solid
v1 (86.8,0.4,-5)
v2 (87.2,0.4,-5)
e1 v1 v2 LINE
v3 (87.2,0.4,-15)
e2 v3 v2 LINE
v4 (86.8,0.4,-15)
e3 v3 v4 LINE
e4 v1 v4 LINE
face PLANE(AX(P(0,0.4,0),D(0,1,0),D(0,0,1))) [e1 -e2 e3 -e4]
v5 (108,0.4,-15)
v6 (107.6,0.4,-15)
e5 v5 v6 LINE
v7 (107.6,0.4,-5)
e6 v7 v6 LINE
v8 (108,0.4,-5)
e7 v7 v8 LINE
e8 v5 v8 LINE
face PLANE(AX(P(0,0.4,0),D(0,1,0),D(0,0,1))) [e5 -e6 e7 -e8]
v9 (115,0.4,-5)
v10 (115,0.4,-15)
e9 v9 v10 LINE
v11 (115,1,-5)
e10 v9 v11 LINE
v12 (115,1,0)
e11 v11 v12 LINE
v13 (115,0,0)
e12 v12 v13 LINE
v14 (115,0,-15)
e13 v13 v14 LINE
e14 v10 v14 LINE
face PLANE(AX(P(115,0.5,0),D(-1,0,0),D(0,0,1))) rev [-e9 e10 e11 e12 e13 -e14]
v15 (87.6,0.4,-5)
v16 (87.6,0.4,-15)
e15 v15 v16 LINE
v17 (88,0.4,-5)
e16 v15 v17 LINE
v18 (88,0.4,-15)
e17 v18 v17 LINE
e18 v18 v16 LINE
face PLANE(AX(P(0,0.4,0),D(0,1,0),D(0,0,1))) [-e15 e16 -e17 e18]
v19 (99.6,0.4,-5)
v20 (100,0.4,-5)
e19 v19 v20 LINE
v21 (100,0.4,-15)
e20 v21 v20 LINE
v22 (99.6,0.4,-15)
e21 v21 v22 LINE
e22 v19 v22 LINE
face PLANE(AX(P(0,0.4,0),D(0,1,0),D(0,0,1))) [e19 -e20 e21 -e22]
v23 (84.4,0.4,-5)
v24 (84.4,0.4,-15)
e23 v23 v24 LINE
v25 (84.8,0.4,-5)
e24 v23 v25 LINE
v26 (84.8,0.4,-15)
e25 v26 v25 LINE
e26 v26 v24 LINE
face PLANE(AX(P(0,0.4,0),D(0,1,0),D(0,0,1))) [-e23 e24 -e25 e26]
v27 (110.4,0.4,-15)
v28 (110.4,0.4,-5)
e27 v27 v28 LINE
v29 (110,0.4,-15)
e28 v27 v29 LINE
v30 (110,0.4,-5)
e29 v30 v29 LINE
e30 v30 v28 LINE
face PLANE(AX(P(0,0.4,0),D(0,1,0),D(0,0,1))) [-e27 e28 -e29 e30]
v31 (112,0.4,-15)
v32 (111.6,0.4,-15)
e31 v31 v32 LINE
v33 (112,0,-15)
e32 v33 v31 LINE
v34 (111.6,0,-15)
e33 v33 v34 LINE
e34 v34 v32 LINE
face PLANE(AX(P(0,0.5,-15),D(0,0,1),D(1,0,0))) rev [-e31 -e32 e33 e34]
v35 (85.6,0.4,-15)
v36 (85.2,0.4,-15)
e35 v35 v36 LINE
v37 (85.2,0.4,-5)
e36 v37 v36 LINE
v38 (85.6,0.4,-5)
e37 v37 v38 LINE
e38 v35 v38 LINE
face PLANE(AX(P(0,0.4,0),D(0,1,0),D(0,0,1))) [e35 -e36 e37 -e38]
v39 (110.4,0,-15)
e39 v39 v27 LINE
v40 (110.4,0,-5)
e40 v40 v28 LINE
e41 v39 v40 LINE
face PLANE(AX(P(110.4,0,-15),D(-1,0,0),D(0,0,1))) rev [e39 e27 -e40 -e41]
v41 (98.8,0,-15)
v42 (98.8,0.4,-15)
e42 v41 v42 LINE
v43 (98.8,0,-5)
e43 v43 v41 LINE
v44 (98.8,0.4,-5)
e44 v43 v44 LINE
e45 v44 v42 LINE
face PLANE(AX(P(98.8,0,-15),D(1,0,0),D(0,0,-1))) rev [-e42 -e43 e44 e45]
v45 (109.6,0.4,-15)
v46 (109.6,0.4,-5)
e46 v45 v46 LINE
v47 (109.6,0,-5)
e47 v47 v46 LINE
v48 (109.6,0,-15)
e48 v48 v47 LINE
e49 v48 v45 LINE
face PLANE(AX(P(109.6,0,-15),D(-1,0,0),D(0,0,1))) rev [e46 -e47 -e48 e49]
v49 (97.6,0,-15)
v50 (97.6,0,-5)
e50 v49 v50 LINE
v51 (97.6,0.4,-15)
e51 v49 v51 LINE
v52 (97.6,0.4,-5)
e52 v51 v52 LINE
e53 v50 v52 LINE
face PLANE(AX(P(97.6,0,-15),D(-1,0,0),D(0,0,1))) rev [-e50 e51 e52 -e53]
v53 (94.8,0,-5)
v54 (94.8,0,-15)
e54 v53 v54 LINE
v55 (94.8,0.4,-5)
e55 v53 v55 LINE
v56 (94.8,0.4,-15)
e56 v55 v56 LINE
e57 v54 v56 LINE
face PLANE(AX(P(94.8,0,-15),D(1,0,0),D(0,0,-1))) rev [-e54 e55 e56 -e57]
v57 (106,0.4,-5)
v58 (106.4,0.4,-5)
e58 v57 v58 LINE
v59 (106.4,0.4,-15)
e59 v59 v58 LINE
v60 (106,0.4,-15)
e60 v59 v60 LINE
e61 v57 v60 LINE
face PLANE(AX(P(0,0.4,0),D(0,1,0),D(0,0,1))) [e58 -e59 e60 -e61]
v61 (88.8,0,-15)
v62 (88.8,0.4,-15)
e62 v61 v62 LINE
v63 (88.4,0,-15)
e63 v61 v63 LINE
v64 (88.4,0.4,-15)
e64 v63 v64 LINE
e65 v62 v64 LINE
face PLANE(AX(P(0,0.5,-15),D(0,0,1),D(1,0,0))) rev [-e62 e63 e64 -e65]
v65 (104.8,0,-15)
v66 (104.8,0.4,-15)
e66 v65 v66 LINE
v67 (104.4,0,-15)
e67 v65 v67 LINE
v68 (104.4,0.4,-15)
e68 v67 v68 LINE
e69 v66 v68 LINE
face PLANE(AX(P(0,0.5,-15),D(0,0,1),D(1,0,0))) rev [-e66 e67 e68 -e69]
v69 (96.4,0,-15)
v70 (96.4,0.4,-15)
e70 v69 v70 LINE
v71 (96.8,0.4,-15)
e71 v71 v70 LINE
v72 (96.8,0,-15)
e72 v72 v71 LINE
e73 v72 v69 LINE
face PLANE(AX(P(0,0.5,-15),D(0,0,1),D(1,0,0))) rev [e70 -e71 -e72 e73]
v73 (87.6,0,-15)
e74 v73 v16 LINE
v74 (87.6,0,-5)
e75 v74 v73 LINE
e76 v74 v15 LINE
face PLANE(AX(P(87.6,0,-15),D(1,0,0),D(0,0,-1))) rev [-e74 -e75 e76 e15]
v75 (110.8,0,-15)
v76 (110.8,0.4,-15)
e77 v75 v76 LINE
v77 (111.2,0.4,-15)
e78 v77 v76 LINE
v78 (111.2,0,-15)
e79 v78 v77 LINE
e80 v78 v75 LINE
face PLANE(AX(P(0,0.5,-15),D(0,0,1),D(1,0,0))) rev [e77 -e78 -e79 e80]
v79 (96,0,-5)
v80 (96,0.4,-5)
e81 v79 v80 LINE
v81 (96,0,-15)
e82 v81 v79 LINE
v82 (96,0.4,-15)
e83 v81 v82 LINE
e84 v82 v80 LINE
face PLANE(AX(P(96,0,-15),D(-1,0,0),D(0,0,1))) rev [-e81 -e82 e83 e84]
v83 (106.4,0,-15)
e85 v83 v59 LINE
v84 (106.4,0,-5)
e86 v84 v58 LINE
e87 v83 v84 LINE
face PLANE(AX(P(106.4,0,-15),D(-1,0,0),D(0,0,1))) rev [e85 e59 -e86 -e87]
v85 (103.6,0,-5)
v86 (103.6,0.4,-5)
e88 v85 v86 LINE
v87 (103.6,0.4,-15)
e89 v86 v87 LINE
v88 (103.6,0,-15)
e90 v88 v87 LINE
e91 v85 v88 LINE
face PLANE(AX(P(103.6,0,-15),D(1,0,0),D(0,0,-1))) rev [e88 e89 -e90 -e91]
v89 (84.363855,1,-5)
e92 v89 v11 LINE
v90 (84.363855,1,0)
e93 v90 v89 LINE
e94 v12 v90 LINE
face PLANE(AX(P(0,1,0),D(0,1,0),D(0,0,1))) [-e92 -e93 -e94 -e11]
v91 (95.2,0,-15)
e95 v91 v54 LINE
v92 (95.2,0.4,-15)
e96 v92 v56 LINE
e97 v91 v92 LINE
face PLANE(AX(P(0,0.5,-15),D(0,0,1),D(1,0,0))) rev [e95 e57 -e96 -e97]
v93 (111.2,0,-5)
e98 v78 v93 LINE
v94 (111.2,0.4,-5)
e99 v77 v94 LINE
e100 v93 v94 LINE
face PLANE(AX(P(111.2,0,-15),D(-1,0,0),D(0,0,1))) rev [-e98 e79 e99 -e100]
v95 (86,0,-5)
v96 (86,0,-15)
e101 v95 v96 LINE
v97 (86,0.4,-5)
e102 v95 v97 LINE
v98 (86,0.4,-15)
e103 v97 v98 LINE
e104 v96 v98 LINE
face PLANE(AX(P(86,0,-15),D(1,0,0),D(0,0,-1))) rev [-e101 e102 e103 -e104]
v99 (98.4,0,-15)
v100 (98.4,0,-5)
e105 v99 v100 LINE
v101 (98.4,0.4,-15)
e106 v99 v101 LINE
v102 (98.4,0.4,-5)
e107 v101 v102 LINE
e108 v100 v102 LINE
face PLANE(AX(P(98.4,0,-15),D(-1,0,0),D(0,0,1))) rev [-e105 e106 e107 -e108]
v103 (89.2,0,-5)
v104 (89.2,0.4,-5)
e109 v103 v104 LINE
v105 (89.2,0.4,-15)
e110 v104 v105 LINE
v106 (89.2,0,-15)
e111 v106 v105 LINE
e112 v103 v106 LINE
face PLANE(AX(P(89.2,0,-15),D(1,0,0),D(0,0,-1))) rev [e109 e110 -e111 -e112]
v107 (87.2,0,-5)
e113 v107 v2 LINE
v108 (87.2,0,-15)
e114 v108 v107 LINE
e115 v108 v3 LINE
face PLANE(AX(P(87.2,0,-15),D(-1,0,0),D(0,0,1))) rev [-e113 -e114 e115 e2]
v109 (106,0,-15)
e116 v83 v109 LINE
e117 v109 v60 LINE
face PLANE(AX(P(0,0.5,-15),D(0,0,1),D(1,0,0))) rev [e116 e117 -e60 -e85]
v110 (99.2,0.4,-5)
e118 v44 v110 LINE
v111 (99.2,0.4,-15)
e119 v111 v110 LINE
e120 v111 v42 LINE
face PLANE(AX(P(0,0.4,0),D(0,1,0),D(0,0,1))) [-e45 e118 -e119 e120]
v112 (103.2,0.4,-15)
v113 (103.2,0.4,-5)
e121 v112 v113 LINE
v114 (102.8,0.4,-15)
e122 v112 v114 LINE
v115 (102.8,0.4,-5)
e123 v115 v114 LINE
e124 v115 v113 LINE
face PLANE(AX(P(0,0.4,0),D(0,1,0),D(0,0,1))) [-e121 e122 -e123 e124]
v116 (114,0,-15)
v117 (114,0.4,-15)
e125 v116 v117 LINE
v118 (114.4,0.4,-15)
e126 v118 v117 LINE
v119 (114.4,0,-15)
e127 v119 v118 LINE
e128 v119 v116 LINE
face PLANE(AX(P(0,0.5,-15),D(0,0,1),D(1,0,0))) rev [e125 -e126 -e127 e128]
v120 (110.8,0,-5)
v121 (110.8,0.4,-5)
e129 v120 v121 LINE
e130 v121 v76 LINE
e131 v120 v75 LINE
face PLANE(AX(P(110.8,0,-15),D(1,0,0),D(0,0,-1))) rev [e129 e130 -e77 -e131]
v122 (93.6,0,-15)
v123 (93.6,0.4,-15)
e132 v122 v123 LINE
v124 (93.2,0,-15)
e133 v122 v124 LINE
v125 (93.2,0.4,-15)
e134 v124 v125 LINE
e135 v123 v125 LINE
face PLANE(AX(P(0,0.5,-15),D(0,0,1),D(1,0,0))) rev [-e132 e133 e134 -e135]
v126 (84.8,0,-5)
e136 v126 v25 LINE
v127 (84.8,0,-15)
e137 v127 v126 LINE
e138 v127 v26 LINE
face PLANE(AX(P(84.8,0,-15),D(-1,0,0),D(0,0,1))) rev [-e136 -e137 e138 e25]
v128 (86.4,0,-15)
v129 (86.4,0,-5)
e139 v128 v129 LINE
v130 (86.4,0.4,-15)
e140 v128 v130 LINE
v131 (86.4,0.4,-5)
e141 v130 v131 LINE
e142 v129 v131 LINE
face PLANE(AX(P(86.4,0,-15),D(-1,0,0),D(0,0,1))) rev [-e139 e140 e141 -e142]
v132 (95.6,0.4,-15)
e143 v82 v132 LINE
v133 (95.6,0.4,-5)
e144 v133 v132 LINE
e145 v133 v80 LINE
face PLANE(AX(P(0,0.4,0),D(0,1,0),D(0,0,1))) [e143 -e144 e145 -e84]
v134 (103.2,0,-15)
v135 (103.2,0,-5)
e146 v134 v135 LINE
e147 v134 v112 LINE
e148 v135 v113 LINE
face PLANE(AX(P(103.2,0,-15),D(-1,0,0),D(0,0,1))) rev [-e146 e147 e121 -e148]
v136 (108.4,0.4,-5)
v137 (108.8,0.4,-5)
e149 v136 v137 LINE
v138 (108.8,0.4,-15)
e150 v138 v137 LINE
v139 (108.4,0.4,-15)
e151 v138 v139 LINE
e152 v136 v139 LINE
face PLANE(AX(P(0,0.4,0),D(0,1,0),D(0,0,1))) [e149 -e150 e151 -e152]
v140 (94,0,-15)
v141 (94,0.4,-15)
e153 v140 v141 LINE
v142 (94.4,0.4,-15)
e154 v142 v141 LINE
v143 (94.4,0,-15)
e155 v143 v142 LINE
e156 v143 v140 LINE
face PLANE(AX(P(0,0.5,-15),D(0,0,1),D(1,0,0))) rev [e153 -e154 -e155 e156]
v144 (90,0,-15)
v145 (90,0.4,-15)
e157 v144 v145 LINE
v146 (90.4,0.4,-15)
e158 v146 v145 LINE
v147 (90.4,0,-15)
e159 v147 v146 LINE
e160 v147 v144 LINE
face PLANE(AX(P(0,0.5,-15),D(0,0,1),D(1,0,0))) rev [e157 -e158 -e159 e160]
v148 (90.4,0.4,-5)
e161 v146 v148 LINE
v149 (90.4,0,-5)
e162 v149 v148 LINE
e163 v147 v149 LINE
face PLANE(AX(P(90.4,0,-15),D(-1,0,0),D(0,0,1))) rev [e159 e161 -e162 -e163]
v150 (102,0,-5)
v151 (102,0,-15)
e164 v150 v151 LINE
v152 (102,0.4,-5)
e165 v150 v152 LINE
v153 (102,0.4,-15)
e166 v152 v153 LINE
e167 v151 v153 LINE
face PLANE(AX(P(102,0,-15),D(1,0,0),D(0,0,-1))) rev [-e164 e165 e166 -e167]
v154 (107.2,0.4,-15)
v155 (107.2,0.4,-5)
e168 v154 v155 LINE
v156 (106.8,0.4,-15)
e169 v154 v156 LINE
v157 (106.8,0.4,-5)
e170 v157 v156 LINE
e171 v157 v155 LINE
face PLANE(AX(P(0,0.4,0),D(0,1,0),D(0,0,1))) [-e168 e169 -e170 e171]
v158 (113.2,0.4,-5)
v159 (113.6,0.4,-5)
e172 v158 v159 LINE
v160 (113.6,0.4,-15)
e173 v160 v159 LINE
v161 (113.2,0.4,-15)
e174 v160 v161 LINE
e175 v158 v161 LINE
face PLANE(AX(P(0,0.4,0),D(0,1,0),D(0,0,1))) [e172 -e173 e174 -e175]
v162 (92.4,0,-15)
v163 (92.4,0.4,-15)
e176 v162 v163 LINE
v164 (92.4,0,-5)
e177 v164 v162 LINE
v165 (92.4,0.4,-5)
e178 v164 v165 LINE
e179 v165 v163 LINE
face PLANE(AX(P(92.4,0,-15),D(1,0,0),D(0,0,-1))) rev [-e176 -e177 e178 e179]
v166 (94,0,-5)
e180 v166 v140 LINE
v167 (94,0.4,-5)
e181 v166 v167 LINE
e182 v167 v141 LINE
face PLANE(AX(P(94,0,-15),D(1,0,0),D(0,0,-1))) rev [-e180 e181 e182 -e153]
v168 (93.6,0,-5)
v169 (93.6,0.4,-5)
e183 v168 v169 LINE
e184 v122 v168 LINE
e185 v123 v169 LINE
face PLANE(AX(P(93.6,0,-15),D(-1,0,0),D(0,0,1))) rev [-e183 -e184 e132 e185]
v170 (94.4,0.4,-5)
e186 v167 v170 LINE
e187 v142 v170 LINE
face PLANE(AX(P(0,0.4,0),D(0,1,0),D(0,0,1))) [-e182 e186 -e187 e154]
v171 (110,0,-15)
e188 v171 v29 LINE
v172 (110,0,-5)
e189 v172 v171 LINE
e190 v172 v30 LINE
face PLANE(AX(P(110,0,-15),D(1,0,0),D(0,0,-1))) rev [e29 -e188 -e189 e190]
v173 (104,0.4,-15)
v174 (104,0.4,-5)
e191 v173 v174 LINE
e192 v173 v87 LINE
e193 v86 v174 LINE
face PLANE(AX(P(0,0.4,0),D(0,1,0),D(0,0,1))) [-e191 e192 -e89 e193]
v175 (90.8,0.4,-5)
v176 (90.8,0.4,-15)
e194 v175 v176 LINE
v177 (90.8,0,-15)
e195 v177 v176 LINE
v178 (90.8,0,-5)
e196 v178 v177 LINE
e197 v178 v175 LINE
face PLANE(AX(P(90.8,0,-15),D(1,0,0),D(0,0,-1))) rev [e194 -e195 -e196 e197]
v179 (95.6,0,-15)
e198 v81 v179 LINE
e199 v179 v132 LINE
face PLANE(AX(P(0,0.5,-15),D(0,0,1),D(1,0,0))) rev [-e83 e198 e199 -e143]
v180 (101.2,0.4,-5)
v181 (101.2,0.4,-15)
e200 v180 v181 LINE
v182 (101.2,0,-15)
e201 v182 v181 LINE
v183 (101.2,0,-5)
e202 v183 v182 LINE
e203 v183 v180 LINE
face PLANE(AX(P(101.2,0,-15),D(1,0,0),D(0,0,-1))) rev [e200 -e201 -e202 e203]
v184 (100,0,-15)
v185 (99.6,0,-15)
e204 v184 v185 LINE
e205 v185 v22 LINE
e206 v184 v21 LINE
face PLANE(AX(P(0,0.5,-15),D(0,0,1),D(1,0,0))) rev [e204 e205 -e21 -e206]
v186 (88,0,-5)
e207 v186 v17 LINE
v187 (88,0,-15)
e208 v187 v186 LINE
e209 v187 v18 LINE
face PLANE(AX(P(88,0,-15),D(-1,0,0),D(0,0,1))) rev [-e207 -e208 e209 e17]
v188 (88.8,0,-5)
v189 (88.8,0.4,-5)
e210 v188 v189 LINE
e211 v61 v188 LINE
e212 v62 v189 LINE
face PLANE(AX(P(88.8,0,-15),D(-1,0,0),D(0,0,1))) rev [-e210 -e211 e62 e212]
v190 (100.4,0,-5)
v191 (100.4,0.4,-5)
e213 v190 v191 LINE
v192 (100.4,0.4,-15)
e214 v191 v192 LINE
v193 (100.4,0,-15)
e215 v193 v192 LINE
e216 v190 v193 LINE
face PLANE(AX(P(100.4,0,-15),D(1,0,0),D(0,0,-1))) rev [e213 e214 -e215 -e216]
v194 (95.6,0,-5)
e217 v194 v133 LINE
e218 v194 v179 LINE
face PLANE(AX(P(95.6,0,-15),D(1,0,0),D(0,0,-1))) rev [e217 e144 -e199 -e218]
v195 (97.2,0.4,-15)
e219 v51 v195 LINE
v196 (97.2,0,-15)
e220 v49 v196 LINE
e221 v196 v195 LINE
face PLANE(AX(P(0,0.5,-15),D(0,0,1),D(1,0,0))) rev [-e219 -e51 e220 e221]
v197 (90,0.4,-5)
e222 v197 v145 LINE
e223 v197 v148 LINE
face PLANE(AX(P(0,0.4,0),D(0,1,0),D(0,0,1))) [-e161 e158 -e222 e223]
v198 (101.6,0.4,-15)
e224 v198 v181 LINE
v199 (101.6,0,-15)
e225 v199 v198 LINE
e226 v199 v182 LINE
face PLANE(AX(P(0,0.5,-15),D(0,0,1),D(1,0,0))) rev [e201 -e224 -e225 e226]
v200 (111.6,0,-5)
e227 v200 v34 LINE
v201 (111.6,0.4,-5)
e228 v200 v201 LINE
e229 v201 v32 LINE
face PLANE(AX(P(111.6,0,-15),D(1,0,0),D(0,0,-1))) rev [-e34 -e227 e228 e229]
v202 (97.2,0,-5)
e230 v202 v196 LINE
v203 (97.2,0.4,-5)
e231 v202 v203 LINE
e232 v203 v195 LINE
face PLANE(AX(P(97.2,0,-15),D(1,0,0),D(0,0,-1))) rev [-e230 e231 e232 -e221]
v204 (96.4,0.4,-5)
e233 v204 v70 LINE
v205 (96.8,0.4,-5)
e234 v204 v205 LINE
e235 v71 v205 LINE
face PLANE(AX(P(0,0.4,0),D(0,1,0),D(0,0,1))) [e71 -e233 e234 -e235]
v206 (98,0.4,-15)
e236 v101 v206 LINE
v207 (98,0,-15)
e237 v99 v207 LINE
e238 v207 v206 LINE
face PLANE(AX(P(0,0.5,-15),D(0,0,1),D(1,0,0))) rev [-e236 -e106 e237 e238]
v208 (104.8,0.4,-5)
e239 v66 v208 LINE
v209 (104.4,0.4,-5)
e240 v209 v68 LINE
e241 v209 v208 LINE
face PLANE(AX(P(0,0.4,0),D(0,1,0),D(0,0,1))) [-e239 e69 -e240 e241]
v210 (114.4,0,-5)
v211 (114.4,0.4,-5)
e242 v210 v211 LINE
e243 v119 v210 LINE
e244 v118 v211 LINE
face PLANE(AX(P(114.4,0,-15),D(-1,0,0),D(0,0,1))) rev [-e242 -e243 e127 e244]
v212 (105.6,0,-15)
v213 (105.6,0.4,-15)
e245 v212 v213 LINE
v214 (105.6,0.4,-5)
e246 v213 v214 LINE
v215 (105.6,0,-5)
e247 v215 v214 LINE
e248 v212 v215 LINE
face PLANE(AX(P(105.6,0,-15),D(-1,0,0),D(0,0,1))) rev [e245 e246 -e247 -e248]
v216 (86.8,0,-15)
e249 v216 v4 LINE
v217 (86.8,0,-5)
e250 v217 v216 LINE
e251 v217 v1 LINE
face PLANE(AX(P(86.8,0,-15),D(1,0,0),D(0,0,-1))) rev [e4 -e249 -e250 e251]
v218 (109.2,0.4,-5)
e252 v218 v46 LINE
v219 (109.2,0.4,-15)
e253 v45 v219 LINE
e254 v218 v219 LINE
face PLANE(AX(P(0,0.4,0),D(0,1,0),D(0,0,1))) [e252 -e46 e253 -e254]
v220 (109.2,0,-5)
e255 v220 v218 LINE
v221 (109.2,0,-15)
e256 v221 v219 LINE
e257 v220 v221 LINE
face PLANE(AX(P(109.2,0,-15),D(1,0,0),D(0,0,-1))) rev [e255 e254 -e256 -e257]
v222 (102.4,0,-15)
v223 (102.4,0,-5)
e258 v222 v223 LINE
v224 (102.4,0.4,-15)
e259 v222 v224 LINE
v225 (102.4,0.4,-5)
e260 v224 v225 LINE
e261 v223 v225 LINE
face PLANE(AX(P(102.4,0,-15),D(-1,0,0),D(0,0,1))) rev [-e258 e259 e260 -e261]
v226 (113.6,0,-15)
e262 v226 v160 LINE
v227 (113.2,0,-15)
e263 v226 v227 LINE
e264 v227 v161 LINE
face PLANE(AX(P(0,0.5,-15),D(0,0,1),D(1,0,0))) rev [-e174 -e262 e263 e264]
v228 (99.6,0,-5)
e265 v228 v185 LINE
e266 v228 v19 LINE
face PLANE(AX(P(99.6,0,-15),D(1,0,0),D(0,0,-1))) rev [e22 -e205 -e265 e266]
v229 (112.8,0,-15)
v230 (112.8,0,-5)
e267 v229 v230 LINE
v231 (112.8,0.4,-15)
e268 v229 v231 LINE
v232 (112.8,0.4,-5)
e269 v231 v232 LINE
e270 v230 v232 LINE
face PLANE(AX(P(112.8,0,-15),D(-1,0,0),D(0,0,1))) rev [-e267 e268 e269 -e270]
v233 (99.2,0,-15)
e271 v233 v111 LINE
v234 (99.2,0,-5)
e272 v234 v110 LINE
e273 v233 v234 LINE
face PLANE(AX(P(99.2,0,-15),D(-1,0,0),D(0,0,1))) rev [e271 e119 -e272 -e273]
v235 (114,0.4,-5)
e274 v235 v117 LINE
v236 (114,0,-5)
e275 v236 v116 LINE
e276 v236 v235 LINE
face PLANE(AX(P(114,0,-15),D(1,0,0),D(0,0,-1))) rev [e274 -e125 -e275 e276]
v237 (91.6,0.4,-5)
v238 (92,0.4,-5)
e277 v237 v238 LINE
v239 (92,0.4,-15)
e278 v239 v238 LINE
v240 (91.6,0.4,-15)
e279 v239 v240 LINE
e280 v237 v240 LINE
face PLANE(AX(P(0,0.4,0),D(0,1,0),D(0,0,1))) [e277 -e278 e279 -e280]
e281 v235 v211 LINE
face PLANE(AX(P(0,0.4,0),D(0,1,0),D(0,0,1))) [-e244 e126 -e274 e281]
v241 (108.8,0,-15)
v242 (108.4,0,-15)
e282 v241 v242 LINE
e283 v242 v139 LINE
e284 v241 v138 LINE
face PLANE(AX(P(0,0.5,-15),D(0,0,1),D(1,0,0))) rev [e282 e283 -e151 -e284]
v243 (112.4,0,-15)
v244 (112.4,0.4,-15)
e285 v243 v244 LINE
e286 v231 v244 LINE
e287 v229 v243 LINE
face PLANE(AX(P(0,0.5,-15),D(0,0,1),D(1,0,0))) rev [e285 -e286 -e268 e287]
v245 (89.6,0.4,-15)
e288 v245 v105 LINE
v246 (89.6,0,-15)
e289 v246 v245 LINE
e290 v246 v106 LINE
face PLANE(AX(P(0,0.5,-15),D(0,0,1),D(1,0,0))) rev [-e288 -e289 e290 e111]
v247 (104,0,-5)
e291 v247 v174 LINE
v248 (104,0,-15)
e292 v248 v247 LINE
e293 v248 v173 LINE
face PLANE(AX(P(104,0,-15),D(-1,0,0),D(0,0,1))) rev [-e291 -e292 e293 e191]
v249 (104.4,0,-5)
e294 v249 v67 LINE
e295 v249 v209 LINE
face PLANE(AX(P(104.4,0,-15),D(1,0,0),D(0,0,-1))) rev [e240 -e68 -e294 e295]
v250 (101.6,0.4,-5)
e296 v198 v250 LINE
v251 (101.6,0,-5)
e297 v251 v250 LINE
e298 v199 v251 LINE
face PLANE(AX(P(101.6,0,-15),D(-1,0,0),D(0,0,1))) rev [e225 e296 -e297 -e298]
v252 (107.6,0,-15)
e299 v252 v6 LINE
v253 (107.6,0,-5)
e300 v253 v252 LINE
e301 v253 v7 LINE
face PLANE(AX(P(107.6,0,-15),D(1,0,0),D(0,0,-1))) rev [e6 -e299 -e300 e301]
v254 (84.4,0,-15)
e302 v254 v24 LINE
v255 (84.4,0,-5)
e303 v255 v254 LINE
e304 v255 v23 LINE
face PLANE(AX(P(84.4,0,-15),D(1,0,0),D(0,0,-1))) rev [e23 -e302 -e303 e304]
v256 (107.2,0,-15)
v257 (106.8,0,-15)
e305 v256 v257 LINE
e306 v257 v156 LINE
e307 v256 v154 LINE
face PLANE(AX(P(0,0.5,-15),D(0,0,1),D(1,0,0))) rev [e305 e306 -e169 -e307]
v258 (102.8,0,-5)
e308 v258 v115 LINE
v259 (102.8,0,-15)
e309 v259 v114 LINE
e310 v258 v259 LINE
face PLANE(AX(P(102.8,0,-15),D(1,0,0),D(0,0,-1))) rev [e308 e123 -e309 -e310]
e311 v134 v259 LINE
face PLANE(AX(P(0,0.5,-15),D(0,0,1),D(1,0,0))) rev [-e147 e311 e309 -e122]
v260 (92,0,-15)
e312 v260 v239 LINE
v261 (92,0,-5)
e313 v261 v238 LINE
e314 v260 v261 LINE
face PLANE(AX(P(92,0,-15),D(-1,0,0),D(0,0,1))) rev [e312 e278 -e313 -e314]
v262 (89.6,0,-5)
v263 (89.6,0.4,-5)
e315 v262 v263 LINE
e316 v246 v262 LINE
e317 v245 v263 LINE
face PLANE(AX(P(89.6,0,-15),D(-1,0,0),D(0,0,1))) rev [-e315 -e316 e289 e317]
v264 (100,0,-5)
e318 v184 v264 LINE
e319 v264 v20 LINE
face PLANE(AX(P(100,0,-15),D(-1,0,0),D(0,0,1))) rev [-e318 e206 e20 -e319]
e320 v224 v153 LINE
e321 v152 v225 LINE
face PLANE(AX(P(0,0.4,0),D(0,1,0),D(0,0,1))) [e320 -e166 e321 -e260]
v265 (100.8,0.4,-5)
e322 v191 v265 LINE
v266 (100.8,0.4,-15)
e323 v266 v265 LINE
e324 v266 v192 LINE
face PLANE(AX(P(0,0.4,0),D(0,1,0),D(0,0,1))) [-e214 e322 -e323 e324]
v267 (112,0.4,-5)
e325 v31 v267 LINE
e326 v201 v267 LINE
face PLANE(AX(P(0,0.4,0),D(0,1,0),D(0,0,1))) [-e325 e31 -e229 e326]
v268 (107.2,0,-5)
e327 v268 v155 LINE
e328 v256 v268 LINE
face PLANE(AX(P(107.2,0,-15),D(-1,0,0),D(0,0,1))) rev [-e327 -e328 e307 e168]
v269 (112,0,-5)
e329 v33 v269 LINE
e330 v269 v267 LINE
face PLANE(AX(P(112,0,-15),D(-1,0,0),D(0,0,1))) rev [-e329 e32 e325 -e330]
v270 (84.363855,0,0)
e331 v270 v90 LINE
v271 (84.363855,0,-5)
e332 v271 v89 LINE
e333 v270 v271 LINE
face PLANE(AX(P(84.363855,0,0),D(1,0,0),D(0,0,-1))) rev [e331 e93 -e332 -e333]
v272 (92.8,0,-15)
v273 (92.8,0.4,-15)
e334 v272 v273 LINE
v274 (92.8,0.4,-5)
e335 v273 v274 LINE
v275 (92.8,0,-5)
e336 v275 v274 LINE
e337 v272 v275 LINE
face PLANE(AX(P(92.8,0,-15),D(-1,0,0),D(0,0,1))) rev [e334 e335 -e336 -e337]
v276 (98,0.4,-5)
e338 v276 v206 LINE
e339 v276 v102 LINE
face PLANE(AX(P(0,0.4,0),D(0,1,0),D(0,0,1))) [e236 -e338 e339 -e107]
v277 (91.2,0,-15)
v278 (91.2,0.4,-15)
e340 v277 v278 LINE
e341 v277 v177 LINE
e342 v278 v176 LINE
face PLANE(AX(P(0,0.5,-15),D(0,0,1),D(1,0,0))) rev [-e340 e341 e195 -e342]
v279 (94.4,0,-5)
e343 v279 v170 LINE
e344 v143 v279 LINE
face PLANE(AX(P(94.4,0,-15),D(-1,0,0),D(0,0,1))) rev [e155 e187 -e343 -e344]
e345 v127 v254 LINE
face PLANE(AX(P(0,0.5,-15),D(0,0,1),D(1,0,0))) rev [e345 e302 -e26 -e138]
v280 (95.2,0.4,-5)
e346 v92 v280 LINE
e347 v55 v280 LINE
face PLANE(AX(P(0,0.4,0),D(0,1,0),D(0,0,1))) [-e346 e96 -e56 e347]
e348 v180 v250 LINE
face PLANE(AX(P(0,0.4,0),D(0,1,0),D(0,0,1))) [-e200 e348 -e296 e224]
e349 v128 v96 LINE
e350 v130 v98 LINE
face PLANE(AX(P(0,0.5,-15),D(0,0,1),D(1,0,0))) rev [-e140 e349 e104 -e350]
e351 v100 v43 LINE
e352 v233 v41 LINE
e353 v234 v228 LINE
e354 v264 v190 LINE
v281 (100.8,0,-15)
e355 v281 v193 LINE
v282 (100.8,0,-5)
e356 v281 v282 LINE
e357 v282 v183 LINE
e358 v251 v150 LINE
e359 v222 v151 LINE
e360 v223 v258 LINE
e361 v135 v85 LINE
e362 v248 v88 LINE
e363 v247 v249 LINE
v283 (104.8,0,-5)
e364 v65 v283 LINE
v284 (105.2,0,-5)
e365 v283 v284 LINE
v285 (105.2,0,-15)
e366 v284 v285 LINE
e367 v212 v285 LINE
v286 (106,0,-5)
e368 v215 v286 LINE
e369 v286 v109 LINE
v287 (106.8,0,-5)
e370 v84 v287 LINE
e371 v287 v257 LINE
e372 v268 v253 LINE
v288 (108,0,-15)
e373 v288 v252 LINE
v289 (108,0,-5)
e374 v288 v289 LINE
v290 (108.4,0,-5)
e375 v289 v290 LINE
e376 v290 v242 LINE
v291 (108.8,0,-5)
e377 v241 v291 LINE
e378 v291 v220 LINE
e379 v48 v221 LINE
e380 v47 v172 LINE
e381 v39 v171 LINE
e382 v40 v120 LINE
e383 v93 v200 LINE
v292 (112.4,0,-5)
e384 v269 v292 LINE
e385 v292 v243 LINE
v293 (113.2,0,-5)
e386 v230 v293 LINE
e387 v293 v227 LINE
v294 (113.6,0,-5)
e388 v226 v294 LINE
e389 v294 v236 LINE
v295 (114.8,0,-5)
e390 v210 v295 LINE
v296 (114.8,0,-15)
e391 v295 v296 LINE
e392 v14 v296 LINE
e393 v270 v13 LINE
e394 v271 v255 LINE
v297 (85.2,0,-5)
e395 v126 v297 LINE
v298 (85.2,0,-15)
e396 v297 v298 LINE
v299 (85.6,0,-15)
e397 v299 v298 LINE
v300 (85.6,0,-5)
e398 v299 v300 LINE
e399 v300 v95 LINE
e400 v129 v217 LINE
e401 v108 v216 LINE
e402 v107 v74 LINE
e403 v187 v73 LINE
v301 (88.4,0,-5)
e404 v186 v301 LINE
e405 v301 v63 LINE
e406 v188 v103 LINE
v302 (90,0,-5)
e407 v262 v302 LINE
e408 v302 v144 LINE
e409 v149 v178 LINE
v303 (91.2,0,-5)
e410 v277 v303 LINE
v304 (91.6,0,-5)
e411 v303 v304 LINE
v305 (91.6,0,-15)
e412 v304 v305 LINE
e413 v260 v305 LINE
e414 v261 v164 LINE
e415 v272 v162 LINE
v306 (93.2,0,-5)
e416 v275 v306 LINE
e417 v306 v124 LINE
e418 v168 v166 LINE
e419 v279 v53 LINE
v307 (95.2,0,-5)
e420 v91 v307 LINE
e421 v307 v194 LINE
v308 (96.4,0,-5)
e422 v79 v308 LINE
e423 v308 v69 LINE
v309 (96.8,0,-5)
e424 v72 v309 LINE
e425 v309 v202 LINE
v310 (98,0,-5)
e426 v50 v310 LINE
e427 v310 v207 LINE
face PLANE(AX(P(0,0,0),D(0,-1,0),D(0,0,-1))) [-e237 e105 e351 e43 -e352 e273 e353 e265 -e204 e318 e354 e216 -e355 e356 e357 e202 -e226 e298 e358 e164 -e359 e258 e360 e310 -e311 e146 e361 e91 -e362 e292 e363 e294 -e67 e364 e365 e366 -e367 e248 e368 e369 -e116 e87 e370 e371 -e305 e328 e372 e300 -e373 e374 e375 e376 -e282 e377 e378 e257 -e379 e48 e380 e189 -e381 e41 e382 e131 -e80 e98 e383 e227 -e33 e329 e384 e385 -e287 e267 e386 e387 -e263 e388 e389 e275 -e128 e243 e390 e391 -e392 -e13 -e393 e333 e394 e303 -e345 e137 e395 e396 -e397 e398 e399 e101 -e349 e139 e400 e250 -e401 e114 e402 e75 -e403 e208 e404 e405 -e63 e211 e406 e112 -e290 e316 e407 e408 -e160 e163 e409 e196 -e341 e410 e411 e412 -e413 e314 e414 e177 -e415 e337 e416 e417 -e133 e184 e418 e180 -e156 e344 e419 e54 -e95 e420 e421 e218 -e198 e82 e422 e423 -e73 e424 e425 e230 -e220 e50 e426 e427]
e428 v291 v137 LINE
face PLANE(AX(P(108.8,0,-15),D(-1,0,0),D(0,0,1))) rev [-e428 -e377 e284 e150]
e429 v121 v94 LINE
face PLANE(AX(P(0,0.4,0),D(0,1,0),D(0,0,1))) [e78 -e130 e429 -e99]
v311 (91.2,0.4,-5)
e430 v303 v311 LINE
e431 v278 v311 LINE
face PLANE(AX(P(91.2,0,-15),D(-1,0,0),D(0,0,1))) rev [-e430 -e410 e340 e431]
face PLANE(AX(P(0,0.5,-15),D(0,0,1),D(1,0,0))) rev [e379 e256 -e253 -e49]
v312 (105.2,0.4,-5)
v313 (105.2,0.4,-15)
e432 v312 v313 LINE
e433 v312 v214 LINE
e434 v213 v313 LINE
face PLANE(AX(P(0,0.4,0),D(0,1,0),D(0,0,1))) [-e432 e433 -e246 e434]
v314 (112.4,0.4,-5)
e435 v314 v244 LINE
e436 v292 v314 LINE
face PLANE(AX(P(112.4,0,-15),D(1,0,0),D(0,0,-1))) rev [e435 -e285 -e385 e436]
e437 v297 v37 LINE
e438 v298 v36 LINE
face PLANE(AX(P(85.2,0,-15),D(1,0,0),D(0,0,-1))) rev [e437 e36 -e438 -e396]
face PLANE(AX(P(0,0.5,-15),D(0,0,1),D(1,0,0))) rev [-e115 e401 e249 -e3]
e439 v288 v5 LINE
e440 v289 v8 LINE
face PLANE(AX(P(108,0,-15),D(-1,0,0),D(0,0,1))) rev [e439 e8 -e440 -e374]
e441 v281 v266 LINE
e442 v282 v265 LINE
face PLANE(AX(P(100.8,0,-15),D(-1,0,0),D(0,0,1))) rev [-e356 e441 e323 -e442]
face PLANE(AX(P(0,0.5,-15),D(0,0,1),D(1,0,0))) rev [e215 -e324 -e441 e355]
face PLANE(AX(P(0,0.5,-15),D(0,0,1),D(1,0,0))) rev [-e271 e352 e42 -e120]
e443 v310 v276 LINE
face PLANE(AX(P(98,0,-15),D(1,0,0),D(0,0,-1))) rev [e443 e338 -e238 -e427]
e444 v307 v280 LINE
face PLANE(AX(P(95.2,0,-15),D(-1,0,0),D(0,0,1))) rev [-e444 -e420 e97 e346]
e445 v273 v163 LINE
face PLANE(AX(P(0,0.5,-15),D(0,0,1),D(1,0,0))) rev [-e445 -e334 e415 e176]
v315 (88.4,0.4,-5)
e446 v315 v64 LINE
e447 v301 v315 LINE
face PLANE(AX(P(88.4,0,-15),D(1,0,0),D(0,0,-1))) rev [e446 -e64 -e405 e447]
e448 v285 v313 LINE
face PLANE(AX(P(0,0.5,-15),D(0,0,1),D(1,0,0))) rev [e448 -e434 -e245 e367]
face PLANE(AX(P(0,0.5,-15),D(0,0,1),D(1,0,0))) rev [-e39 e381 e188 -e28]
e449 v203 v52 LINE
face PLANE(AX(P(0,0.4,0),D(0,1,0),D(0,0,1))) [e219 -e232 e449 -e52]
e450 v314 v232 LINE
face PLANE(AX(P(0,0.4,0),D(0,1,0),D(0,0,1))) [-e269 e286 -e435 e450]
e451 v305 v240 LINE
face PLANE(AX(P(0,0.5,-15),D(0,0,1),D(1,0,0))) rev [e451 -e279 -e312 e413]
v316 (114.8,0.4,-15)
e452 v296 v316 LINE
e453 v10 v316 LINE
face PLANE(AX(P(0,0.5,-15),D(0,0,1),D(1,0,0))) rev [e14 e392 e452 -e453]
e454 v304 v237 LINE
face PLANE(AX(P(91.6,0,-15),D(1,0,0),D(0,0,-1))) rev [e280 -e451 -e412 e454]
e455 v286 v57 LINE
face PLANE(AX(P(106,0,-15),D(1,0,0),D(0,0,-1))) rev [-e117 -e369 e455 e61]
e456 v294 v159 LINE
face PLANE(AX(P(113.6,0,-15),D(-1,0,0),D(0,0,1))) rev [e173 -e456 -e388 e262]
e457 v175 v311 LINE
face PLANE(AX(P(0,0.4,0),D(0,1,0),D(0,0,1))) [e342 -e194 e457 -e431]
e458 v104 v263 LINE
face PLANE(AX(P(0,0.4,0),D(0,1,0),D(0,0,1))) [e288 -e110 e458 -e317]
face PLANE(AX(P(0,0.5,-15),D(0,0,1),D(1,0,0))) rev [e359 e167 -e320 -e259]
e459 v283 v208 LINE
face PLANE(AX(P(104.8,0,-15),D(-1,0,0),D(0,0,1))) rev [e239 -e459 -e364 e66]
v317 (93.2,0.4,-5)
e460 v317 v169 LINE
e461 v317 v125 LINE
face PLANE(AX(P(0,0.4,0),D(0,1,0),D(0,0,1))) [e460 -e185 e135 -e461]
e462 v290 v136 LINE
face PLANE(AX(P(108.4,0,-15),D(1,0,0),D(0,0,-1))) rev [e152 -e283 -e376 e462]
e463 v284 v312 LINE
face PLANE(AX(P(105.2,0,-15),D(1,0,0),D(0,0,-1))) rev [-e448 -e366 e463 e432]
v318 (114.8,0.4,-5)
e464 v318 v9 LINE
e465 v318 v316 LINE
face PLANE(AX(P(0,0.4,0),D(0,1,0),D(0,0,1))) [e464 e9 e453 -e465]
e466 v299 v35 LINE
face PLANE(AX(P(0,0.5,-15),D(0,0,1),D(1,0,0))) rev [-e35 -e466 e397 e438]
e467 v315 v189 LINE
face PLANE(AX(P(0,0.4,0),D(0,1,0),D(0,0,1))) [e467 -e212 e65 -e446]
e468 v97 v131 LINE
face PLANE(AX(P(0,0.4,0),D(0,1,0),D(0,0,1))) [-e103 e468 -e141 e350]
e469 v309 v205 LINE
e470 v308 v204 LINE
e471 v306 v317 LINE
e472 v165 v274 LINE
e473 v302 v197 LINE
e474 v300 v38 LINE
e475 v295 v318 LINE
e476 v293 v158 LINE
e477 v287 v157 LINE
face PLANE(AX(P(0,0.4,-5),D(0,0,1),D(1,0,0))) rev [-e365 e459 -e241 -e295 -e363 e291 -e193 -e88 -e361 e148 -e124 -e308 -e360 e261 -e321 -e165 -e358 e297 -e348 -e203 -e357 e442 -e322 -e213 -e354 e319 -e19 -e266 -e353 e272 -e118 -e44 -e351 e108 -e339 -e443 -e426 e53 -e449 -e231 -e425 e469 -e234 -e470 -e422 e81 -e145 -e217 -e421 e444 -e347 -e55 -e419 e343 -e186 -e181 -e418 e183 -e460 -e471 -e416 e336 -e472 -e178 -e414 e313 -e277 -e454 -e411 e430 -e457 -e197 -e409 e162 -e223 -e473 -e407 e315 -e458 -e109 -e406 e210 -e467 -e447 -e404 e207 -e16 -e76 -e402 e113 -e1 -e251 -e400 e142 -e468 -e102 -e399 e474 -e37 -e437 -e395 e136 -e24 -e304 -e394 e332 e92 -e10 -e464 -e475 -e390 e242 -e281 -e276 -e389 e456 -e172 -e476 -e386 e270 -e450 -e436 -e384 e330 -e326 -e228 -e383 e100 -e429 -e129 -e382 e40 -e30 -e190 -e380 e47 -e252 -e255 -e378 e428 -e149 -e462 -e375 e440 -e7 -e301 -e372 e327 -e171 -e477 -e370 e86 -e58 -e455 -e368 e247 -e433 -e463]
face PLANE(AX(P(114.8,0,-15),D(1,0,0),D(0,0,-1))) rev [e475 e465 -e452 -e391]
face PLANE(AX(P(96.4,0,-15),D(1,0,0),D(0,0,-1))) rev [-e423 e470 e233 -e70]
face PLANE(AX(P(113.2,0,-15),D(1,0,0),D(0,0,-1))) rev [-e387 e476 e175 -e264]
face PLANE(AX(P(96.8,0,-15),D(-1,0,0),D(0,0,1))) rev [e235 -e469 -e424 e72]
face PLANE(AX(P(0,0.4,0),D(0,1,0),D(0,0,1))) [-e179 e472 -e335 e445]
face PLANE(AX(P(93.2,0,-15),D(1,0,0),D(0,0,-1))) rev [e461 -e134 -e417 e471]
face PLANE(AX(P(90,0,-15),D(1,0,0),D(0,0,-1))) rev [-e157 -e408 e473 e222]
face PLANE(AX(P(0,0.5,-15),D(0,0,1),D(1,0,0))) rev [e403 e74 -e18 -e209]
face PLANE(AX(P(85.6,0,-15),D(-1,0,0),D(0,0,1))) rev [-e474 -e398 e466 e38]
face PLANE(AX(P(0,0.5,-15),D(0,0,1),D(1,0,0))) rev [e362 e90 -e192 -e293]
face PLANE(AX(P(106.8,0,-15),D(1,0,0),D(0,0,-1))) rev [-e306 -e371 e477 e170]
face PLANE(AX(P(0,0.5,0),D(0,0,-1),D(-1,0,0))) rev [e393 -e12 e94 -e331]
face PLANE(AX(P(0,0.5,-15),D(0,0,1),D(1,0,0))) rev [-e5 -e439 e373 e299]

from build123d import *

# Parameters (mm, degrees)
SKETCH1_W           = 115
SKETCH1_H           = 15
BOSS_EXTRUDE1_DEPTH = 0.5
SKETCH2_W           = 115
SKETCH2_H           = 10
CUT_EXTRUDE1_DEPTH  = 0.1
SKETCH3_W           = 0.4
SKETCH3_H           = 10
CUT_EXTRUDE2_DEPTH  = 0.4
LPATTERN3_COUNT     = 150
LPATTERN3_PITCH     = 0.8
SKETCH4_W           = 115
SKETCH4_H           = 5
BOSS_EXTRUDE2_DEPTH = 1
SKETCH5_W           = 77.289086501
SKETCH5_H           = 15.822063322
CUT_EXTRUDE3_DEPTH  = 1
SKETCH6_W           = 3.197112069
SKETCH6_H           = 15.066627115
CUT_EXTRUDE4_DEPTH  = 1
SKETCH7_W           = 3.877656405
SKETCH7_H           = 15.126214191
CUT_EXTRUDE7_DEPTH  = 1


with BuildPart() as part:
    # Sketch1 → Boss-Extrude1 (new body)
    with BuildSketch(Plane(origin=(0, 0, 0), x_dir=(1, 0, 0), z_dir=(0, 1, 0))):
        with Locations((57.5, 7.5)):
            Rectangle(SKETCH1_W, SKETCH1_H)
    extrude(amount=BOSS_EXTRUDE1_DEPTH)

    # Sketch2 → Cut-Extrude1 (cut)
    with BuildSketch(Plane(origin=(0, 0.5, 0), x_dir=(1, 0, 0), z_dir=(0, 1, 0))):
        with Locations((57.5, 10)):
            Rectangle(SKETCH2_W, SKETCH2_H)
    extrude(amount=-CUT_EXTRUDE1_DEPTH, mode=Mode.SUBTRACT)

    # Sketch3 → Cut-Extrude2 (cut)
    with BuildSketch(Plane(origin=(0, 0.4, 0), x_dir=(1, 0, 0), z_dir=(0, 1, 0))):
        with Locations((0.2, 10)):
            Rectangle(SKETCH3_W, SKETCH3_H)
    cut_extrude2 = extrude(amount=-CUT_EXTRUDE2_DEPTH, mode=Mode.SUBTRACT)

    # LPattern3: Cut-Extrude2 ×150
    with Locations(*[(i * LPATTERN3_PITCH, 0, 0) for i in range(1, LPATTERN3_COUNT)]):
        add(cut_extrude2, mode=Mode.SUBTRACT)

    # Sketch4 → Boss-Extrude2 (add)
    with BuildSketch(Plane.XZ):
        with Locations((57.5, -2.5)):
            Rectangle(SKETCH4_W, SKETCH4_H)
    extrude(amount=-BOSS_EXTRUDE2_DEPTH)

    # Sketch5 → Cut-Extrude3 (cut)
    with BuildSketch(Plane(origin=(0, 1, 0), x_dir=(1, 0, 0), z_dir=(0, 1, 0))):
        with Locations((38.64454325, 7.911031661)):
            Rectangle(SKETCH5_W, SKETCH5_H)
    extrude(amount=-CUT_EXTRUDE3_DEPTH, mode=Mode.SUBTRACT)

    # Sketch6 → Cut-Extrude4 (cut)
    with BuildSketch(Plane(origin=(0, 1, 0), x_dir=(1, 0, 0), z_dir=(0, 1, 0))):
        with Locations((78.887642535, 7.533313558)):
            Rectangle(SKETCH6_W, SKETCH6_H)
    extrude(amount=-CUT_EXTRUDE4_DEPTH, mode=Mode.SUBTRACT)

    # Sketch7 → Cut-Extrude7 (cut)
    with BuildSketch(Plane(origin=(0, 1, 0), x_dir=(1, 0, 0), z_dir=(0, 1, 0))):
        with Locations((82.425026773, 7.563107096)):
            Rectangle(SKETCH7_W, SKETCH7_H)
    extrude(amount=-CUT_EXTRUDE7_DEPTH, mode=Mode.SUBTRACT)


solid = part.part
